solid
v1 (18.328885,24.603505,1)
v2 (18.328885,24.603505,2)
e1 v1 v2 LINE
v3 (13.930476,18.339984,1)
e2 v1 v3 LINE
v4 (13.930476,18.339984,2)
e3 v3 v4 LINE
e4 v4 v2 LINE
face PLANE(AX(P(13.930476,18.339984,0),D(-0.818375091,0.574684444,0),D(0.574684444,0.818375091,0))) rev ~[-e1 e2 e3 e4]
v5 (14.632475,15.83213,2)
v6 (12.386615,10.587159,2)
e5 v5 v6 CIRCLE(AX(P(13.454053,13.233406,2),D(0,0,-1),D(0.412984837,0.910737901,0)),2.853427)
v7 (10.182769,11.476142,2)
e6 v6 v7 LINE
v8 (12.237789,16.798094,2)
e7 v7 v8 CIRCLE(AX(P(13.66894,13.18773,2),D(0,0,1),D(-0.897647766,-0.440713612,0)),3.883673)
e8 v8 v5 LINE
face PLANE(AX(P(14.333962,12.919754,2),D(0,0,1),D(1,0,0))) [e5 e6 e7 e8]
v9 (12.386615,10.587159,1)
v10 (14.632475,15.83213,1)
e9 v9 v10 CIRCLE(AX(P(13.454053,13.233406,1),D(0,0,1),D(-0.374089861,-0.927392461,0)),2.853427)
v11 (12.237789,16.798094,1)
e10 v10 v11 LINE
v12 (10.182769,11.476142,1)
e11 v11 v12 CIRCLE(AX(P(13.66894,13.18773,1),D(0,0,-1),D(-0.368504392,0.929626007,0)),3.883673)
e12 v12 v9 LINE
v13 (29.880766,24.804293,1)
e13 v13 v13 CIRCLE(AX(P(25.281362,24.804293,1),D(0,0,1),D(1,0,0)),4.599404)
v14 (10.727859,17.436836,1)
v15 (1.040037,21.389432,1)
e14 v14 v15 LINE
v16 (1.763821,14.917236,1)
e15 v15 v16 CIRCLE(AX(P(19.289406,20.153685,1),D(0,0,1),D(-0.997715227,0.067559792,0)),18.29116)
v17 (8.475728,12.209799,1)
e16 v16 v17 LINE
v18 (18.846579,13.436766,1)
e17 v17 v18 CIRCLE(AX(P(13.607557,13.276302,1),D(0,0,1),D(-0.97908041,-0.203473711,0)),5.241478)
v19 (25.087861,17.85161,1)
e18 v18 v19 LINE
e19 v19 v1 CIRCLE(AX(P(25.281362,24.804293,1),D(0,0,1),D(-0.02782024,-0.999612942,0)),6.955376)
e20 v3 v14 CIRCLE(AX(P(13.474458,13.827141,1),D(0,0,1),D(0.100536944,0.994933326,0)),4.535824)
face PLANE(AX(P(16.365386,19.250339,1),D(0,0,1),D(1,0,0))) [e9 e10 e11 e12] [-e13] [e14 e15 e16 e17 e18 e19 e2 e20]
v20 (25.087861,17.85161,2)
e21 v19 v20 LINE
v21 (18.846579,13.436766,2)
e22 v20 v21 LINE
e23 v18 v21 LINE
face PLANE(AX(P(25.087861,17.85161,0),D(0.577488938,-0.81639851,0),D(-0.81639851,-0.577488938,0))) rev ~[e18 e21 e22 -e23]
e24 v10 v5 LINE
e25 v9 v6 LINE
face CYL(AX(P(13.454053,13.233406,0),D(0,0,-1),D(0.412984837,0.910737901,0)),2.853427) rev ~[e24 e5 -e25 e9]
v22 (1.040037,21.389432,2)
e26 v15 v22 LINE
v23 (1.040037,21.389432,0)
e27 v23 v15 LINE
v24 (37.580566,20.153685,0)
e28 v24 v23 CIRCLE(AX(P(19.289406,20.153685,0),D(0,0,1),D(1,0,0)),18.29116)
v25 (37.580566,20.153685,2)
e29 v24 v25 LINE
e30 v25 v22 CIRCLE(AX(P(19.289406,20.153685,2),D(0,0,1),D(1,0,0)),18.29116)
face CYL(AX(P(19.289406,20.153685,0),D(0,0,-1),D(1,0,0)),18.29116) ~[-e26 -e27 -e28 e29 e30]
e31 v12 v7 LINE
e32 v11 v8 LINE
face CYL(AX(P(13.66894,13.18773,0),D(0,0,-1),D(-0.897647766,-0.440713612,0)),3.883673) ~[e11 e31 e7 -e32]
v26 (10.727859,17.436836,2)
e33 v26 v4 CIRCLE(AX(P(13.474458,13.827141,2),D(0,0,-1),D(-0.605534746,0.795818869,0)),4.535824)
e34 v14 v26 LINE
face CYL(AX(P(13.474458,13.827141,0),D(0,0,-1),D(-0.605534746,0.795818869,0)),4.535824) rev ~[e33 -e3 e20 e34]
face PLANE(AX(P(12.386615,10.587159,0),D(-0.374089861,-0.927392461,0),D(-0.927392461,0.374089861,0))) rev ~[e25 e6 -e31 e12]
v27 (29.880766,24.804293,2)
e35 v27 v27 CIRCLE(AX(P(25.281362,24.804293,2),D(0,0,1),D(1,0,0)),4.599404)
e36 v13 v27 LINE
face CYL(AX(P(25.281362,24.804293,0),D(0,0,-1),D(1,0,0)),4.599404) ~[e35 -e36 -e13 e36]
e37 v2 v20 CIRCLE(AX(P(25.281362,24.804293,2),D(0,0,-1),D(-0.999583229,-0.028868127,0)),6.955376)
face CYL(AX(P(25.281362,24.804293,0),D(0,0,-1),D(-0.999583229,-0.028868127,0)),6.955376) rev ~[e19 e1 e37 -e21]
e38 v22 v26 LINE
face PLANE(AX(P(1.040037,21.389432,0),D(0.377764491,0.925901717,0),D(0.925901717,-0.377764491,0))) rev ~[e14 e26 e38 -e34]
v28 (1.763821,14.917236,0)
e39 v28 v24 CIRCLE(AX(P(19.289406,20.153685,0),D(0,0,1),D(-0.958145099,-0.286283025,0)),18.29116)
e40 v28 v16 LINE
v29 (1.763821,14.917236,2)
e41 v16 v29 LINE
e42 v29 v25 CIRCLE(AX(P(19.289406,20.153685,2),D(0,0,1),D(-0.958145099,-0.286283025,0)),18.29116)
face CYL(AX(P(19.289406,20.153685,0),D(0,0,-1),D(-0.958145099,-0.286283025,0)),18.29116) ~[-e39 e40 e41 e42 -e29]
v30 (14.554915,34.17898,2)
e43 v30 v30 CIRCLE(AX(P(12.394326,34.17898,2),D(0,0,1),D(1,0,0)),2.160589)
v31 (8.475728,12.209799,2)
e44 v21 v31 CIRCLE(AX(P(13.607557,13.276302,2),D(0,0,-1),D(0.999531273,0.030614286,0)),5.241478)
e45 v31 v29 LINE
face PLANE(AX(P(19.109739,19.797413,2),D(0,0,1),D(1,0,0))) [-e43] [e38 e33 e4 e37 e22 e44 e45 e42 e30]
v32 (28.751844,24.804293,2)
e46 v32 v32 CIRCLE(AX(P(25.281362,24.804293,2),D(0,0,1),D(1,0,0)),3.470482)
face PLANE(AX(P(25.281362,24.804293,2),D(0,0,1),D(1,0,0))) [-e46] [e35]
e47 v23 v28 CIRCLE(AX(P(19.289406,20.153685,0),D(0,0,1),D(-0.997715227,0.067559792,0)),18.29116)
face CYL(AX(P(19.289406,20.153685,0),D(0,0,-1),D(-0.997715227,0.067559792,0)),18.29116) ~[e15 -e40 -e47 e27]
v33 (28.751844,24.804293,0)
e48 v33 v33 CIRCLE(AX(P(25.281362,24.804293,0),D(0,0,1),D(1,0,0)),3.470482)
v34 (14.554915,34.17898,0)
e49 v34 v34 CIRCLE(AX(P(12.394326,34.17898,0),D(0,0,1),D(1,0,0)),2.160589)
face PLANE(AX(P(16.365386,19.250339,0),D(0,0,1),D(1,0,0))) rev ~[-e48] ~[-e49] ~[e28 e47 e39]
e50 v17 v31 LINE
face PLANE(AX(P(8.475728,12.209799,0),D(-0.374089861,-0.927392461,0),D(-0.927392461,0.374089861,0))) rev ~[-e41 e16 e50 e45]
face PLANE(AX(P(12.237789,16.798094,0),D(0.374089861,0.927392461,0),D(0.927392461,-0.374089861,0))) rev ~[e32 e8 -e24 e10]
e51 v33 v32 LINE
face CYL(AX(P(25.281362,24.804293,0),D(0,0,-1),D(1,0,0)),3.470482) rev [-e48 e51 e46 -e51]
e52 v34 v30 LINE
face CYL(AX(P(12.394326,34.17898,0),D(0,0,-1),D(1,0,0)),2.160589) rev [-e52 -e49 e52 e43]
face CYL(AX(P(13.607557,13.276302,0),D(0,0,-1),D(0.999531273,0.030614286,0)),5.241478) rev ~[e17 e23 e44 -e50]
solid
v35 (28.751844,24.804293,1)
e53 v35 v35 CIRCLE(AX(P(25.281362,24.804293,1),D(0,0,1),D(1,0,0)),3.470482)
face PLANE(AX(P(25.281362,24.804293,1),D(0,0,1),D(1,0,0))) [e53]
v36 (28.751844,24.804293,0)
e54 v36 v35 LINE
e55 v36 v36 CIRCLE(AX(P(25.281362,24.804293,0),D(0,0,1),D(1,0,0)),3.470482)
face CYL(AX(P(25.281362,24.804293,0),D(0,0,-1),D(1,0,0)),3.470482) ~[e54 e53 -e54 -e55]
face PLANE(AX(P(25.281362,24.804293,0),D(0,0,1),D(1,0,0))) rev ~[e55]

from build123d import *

# Parameters (mm, degrees)
F0_R     = 2.160588797
F1_DEPTH = 2
F0_R_2   = 4.5994043898
F2_DEPTH = 1
F0_R_3   = 3.4704819518
F3_DEPTH = 2


with BuildPart() as f1:
    # F0 (on Top) → F1 (new body)
    with BuildSketch(Plane.XY):
        with BuildLine():
            ThreePointArc((1.7638206969, 14.9172360687), (21.9354642074, 2.0549303863), (37.5805657932, 20.153684646))
            ThreePointArc((37.5805657932, 20.153684646), (19.9076326038, 38.4343937698), (1.0400371472, 21.3894316028))
            Line((1.0400371472, 21.3894316028), (10.7278591022, 17.4368359149))
            ThreePointArc((10.7278591022, 17.4368359149), (12.2433572681, 18.1926988563), (13.9304762706, 18.3399841189))
            Line((13.9304762706, 18.3399841189), (18.3288846165, 24.6035046875))
            ThreePointArc((18.3288846165, 24.6035046875), (30.1969763648, 29.7250639334), (25.0878613442, 17.8516097367))
            Line((25.0878613442, 17.8516097367), (18.846578896, 13.4367663413))
            ThreePointArc((18.846578896, 13.4367663413), (14.2233775819, 8.0711257596), (8.475728333, 12.2097991407))
            Line((8.475728333, 12.2097991407), (1.7638206969, 14.9172360687))
        make_face()
        with Locations((12.3943258077, 34.1789796948)):
            Circle(F0_R, mode=Mode.SUBTRACT)
    extrude(amount=F1_DEPTH)

    # F0 (on Top) → F2 (join)
    with BuildSketch(Plane.XY):
        with BuildLine():
            Line((10.7278591022, 17.4368359149), (1.0400371472, 21.3894316028))
            ThreePointArc((1.0400371472, 21.3894316028), (1.1115578041, 18.1208617268), (1.7638206969, 14.9172360687))
            Line((1.7638206969, 14.9172360687), (8.475728333, 12.2097991407))
            ThreePointArc((8.475728333, 12.2097991407), (14.2233775819, 8.0711257596), (18.846578896, 13.4367663413))
            Line((18.846578896, 13.4367663413), (25.0878613442, 17.8516097367))
            ThreePointArc((25.0878613442, 17.8516097367), (30.1969763648, 29.7250639334), (18.3288846165, 24.6035046875))
            Line((18.3288846165, 24.6035046875), (13.9304762706, 18.3399841189))
            ThreePointArc((13.9304762706, 18.3399841189), (12.2433572681, 18.1926988563), (10.7278591022, 17.4368359149))
        make_face()
        with BuildLine():
            ThreePointArc((12.2377891093, 16.798093915), (17.2918950944, 11.788760985), (10.1827690378, 11.476142332))
            Line((10.1827690378, 11.476142332), (12.3866147391, 10.587159116))
            ThreePointArc((12.3866147391, 10.587159116), (16.0771253181, 12.1102243495), (14.6324749478, 15.8321299564))
            Line((14.6324749478, 15.8321299564), (12.2377891093, 16.798093915))
        make_face(mode=Mode.SUBTRACT)
        with Locations((25.2813615695, 24.8042933578)):
            Circle(F0_R_2, mode=Mode.SUBTRACT)
    extrude(amount=F2_DEPTH)

    # F0 (on Top) → F3 (join)
    with BuildSketch(Plane.XY):
        with BuildLine():
            Line((12.3866147391, 10.587159116), (10.1827690378, 11.476142332))
            ThreePointArc((10.1827690378, 11.476142332), (17.2918950944, 11.788760985), (12.2377891093, 16.798093915))
            Line((12.2377891093, 16.798093915), (14.6324749478, 15.8321299564))
            ThreePointArc((14.6324749478, 15.8321299564), (16.0771253181, 12.1102243495), (12.3866147391, 10.587159116))
        make_face()
        with Locations((25.2813615695, 24.8042933578)):
            Circle(F0_R_2)
        with Locations((25.2813615695, 24.8042933578)):
            Circle(F0_R_3, mode=Mode.SUBTRACT)
    extrude(amount=F3_DEPTH)


with BuildPart() as f2:
    # F0 (on Top) → F2, piece 2 (new body)
    with BuildSketch(Plane.XY):
        with Locations((25.2813615695, 24.8042933578)):
            Circle(F0_R_3)
    extrude(amount=F2_DEPTH)


solid = Compound([f1.part, f2.part])
